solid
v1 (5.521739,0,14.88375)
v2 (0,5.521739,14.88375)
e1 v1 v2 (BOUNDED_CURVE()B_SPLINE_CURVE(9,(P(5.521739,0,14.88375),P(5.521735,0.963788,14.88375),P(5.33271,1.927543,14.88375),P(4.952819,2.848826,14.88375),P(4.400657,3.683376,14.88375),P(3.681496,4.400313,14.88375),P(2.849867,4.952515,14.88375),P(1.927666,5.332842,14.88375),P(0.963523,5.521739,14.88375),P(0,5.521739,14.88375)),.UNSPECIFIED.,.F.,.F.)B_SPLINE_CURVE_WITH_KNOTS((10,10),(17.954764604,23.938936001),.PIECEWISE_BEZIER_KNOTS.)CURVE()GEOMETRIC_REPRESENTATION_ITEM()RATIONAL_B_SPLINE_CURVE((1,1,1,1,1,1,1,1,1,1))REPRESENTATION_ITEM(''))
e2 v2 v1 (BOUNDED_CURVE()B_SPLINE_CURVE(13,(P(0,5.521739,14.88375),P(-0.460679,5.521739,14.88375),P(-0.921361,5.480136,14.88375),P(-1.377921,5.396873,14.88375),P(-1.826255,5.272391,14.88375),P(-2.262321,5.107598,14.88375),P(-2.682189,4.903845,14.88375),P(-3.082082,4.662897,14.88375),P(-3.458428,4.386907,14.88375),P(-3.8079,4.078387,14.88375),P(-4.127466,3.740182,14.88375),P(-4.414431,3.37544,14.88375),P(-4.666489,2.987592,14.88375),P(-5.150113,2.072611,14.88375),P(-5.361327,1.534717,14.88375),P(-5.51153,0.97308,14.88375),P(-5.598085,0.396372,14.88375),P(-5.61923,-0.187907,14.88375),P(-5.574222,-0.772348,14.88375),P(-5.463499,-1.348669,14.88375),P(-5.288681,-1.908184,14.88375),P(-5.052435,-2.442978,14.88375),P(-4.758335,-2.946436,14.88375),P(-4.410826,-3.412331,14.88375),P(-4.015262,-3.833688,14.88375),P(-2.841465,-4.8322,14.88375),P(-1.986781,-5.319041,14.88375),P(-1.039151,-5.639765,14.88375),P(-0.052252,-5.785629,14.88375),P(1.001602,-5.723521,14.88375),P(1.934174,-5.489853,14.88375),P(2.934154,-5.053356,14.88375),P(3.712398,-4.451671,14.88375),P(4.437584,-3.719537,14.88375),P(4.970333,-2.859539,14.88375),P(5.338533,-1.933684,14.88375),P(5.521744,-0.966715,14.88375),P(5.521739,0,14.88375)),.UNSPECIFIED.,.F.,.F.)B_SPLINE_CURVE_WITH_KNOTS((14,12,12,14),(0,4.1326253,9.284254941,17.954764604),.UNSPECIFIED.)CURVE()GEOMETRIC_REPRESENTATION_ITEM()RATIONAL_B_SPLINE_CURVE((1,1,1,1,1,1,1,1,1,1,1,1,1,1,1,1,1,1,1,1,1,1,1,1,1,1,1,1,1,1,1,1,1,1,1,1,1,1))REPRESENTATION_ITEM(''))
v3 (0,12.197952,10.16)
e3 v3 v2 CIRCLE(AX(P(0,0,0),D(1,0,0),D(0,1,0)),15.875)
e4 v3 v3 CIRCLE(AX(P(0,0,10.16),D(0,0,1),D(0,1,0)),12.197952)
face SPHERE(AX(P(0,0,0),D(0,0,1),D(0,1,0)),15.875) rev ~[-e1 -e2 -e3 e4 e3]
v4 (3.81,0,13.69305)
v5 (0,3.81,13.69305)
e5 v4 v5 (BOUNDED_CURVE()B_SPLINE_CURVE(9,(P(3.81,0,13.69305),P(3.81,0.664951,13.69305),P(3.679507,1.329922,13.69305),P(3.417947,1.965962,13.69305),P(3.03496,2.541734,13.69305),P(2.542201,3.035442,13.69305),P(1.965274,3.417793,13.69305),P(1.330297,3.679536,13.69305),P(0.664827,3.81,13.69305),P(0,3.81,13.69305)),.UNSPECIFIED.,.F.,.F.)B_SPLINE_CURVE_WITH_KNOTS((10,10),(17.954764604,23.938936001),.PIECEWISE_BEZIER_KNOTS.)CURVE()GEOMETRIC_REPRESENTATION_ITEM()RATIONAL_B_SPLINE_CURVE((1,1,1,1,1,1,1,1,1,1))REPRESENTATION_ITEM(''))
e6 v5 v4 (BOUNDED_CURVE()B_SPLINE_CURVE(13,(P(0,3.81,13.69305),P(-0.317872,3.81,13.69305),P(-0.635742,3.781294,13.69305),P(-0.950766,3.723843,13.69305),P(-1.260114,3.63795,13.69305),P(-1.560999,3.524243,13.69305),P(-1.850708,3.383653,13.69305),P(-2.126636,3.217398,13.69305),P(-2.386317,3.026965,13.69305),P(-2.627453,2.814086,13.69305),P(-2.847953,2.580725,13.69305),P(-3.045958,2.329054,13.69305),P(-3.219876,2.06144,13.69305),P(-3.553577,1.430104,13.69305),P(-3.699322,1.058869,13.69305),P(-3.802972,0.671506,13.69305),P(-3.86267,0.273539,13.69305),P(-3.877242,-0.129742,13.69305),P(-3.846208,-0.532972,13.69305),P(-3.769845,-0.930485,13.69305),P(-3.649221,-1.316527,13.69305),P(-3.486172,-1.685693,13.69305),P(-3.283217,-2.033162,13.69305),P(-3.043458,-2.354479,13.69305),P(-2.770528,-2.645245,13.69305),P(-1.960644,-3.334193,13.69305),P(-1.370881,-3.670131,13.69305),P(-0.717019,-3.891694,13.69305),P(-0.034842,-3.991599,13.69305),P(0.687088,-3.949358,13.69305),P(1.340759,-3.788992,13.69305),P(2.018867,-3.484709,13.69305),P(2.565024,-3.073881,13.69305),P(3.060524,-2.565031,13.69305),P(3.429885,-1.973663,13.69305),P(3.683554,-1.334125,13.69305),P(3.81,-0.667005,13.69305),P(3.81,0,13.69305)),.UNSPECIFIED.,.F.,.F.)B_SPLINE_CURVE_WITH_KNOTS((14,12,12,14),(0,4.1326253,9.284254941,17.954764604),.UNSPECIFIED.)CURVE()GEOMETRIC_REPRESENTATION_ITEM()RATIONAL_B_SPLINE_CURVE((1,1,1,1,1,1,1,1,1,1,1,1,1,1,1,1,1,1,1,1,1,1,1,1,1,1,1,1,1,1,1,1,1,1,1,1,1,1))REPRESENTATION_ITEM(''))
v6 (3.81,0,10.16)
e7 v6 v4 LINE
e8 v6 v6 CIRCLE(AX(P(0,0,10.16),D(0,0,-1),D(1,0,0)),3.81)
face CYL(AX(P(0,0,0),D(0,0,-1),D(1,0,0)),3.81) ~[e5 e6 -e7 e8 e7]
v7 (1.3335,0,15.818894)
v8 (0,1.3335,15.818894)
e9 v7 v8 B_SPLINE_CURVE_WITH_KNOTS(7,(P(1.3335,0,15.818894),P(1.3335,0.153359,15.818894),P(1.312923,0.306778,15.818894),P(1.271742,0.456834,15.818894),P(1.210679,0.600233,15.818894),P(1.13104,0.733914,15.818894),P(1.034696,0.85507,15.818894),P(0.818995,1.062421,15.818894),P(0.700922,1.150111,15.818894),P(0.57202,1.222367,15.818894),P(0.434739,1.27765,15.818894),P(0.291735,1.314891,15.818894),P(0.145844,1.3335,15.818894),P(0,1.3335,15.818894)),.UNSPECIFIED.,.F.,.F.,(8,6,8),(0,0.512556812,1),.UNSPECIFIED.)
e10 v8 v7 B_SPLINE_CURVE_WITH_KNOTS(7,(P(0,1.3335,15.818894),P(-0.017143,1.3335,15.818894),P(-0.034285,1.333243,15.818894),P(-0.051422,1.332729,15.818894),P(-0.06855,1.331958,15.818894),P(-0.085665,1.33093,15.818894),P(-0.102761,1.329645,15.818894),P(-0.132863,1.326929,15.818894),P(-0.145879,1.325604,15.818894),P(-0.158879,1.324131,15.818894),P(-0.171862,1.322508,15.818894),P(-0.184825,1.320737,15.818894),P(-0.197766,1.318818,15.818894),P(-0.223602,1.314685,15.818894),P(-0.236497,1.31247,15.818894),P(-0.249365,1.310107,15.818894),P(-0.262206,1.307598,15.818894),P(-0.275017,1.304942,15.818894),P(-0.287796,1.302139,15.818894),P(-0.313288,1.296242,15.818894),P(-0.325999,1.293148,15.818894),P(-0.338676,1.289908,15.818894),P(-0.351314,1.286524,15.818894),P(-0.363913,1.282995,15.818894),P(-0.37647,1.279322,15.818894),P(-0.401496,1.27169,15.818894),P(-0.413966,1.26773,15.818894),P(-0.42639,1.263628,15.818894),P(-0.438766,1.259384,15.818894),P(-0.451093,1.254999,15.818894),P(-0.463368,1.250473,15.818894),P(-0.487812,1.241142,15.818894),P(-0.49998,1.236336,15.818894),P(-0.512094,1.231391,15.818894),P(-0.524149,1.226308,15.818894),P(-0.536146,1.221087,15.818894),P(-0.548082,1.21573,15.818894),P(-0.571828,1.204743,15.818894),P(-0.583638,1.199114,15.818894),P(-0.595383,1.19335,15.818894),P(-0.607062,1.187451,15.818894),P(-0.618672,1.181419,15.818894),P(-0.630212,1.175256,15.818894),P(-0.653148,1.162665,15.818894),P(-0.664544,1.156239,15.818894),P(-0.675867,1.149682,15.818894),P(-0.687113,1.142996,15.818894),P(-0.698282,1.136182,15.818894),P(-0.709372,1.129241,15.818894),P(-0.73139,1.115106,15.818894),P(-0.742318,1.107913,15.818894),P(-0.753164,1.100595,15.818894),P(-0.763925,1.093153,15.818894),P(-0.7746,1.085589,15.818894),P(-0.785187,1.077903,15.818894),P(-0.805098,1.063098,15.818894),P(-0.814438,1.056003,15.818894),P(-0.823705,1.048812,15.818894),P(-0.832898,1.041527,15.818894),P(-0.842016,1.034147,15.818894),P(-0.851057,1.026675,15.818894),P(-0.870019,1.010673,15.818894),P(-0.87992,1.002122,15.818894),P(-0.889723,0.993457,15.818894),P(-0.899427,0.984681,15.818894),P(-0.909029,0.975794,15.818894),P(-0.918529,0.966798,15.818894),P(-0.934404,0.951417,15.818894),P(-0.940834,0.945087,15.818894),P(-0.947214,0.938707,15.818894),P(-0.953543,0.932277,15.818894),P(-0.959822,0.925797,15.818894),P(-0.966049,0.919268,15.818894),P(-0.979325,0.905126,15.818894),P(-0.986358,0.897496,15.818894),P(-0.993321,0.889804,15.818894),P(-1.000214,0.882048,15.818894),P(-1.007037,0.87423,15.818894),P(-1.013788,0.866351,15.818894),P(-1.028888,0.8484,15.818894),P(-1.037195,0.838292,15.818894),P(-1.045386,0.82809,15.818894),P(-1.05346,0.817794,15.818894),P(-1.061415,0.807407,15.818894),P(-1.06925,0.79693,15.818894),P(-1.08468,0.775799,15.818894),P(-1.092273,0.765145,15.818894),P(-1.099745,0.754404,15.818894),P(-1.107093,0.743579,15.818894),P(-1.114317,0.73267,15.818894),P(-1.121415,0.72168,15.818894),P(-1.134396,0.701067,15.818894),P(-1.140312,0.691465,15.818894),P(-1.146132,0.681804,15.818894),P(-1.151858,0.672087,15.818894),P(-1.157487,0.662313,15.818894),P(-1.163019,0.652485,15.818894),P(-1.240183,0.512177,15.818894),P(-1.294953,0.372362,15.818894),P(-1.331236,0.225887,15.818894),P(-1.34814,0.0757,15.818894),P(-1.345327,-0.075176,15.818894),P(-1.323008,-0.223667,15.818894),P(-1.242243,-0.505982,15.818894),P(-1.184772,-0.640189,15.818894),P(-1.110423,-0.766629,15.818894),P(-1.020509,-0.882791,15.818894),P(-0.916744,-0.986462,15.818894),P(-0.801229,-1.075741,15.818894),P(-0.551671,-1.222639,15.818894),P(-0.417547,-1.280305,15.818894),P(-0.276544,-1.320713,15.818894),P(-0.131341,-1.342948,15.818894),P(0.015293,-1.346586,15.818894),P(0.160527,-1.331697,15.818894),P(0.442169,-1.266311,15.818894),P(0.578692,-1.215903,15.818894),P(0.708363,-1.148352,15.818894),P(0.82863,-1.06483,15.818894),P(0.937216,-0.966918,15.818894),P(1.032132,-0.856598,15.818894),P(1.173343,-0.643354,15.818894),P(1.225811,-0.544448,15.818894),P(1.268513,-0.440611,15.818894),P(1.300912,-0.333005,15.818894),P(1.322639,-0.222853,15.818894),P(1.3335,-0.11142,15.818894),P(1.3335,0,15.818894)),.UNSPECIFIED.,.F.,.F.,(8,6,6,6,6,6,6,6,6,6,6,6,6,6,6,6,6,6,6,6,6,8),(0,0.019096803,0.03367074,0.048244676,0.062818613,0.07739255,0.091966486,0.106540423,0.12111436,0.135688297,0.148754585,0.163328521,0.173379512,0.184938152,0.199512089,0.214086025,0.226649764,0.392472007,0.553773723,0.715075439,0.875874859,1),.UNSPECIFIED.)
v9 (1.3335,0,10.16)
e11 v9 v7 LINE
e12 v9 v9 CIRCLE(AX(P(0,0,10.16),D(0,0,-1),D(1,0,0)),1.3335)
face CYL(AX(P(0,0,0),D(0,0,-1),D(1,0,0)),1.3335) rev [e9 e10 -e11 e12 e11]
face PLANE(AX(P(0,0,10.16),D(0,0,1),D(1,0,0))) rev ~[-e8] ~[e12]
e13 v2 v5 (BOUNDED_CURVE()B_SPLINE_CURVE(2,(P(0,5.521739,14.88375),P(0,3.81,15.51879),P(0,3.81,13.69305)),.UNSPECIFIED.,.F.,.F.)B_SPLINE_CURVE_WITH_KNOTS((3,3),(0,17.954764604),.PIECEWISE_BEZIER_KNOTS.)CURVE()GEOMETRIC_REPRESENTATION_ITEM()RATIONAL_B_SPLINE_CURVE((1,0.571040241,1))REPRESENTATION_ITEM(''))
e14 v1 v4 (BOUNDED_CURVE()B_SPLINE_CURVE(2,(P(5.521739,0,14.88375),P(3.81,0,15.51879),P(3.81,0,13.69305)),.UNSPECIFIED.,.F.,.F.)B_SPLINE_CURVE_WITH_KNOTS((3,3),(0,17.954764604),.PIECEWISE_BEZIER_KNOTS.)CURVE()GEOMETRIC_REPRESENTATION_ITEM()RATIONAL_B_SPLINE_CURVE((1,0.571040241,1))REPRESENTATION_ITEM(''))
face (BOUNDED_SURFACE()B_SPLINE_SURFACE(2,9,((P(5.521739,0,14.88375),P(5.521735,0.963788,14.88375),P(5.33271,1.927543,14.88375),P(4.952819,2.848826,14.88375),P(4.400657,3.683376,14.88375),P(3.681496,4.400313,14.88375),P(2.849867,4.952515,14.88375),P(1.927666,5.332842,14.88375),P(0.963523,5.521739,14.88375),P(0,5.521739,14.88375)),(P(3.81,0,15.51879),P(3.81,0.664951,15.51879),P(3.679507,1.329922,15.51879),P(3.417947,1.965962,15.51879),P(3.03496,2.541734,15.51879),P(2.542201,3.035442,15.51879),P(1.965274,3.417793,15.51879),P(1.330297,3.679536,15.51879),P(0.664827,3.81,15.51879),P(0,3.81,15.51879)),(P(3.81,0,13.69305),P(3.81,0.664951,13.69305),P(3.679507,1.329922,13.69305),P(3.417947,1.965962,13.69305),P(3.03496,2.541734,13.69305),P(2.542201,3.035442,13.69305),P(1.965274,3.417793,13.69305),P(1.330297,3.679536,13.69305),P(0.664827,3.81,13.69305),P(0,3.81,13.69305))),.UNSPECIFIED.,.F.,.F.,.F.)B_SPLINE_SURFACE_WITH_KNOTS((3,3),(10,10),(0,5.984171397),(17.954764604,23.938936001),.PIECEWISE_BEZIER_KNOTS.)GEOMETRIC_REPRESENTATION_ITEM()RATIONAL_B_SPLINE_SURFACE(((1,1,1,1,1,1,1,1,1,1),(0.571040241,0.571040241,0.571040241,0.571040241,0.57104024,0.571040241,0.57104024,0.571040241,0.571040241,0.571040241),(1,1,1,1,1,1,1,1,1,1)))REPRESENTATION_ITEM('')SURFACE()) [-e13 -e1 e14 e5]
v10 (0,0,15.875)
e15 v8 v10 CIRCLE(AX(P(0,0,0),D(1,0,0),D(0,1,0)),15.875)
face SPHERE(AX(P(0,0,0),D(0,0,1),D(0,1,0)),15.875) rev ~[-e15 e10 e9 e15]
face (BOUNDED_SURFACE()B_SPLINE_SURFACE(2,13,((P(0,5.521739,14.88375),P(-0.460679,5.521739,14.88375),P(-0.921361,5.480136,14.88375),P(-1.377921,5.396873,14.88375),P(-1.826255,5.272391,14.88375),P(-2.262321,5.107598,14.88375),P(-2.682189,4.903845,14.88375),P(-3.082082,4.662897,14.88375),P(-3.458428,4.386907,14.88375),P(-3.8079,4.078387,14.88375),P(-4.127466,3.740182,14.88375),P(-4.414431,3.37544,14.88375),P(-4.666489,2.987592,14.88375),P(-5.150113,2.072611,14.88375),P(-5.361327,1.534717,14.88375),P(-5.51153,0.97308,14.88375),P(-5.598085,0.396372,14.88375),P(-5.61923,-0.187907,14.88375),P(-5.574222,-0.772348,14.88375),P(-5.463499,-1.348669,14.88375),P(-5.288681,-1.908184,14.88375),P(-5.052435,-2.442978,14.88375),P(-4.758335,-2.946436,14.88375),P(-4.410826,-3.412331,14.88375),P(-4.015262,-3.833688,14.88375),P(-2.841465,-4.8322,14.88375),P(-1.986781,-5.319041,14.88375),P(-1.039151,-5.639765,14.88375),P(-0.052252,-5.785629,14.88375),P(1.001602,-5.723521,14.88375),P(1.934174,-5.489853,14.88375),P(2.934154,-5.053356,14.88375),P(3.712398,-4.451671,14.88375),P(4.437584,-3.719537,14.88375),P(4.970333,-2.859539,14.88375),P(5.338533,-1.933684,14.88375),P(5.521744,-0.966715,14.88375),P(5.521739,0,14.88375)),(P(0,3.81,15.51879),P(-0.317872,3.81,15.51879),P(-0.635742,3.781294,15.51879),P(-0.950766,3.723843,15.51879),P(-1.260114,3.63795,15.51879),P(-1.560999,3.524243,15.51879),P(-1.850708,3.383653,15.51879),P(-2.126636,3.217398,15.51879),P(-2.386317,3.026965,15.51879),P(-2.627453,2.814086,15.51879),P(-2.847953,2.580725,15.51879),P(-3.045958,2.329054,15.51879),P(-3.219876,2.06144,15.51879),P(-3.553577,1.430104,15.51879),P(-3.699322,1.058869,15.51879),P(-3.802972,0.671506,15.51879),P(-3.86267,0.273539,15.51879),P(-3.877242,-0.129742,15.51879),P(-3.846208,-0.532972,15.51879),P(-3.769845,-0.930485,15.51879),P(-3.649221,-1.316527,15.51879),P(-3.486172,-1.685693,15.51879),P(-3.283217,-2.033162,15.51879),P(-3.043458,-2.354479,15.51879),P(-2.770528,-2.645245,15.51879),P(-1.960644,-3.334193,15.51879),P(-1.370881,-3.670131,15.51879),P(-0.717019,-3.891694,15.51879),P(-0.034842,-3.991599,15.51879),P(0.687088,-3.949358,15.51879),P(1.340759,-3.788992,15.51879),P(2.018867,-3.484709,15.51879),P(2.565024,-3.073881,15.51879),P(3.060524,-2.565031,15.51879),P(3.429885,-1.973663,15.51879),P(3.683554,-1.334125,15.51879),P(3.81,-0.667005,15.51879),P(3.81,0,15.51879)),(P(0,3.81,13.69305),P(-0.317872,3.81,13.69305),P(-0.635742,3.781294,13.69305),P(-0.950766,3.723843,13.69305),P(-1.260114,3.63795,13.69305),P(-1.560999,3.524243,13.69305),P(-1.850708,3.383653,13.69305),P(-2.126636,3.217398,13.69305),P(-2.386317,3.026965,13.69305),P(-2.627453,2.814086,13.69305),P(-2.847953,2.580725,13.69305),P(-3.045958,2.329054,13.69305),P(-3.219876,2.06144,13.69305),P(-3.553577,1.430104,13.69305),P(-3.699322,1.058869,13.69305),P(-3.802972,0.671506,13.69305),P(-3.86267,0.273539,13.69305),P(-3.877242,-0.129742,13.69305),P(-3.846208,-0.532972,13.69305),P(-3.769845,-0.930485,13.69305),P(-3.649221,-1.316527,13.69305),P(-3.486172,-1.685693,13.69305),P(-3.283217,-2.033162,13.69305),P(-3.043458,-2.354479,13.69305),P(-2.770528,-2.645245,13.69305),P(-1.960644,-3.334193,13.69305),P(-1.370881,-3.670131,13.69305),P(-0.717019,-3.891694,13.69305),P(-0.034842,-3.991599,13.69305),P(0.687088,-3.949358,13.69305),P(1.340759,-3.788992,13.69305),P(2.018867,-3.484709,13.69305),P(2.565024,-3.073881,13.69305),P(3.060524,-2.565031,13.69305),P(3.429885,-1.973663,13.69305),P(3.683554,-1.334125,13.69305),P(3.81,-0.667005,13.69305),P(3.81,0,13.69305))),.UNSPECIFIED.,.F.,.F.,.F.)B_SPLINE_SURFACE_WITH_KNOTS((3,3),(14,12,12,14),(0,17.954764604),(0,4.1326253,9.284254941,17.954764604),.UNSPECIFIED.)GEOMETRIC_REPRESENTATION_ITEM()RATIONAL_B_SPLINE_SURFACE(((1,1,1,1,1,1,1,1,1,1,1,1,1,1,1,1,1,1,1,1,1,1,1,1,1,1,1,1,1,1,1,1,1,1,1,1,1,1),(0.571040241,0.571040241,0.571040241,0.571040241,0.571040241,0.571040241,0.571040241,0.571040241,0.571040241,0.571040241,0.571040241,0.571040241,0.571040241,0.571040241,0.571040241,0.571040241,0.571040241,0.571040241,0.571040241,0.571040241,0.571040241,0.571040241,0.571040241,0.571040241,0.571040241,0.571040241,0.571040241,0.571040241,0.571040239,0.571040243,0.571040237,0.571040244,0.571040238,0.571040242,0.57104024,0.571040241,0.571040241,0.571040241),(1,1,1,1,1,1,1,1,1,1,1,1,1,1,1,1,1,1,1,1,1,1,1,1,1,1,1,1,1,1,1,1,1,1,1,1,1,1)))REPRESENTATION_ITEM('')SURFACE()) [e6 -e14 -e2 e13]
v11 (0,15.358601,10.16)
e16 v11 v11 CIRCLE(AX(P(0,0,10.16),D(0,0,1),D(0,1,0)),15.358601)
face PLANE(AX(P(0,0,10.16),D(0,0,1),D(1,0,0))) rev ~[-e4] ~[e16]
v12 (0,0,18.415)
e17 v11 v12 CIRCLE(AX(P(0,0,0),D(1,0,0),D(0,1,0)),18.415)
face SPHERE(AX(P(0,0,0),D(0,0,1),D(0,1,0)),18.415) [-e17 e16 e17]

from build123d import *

# Parameters (mm, degrees)
F3_T     = -2.54
F4_R     = 3.81
F4_R_2   = 1.3335
F6_R     = 1.27
F7_R     = 18.415
F8_DEPTH = 10.16


with BuildPart() as f2:
    # F1 (on Right) → F2 (revolve)
    with BuildSketch(Plane.YZ):
        with BuildLine():
            Line((0, 18.415), (0, 0))
            Line((0, 0), (18.415, 0))
            ThreePointArc((18.415, 0), (13.0213713756, 13.0213713756), (0, 18.415))
        make_face()
    revolve(axis=Axis((0, 0, 9.2075), (0, 0, 1)))

    # F3
    f3_openings = [f2.faces().sort_by_distance(p)[0] for p in [
        (0, 0, 0),
    ]]
    offset(amount=F3_T, openings=f3_openings)

    # F4 (on face) → F5 (join, up to the next surface of F2)
    with BuildSketch(Plane.XY):
        Circle(F4_R)
        Circle(F4_R_2, mode=Mode.SUBTRACT)
    extrude(until=Until.NEXT)

    # F6
    f6_edges = [f2.edges().sort_by_distance(p)[0] for p in [
        (-2.694077, -2.694077, 15.41102),
        (2.694077, 2.694077, 15.41102),
    ]]
    fillet(f6_edges, radius=F6_R)

    # F7 (on face) → F8 (cut)
    with BuildSketch(Plane.XY):
        Circle(F7_R)
    extrude(amount=F8_DEPTH, mode=Mode.SUBTRACT)


solid = f2.part
